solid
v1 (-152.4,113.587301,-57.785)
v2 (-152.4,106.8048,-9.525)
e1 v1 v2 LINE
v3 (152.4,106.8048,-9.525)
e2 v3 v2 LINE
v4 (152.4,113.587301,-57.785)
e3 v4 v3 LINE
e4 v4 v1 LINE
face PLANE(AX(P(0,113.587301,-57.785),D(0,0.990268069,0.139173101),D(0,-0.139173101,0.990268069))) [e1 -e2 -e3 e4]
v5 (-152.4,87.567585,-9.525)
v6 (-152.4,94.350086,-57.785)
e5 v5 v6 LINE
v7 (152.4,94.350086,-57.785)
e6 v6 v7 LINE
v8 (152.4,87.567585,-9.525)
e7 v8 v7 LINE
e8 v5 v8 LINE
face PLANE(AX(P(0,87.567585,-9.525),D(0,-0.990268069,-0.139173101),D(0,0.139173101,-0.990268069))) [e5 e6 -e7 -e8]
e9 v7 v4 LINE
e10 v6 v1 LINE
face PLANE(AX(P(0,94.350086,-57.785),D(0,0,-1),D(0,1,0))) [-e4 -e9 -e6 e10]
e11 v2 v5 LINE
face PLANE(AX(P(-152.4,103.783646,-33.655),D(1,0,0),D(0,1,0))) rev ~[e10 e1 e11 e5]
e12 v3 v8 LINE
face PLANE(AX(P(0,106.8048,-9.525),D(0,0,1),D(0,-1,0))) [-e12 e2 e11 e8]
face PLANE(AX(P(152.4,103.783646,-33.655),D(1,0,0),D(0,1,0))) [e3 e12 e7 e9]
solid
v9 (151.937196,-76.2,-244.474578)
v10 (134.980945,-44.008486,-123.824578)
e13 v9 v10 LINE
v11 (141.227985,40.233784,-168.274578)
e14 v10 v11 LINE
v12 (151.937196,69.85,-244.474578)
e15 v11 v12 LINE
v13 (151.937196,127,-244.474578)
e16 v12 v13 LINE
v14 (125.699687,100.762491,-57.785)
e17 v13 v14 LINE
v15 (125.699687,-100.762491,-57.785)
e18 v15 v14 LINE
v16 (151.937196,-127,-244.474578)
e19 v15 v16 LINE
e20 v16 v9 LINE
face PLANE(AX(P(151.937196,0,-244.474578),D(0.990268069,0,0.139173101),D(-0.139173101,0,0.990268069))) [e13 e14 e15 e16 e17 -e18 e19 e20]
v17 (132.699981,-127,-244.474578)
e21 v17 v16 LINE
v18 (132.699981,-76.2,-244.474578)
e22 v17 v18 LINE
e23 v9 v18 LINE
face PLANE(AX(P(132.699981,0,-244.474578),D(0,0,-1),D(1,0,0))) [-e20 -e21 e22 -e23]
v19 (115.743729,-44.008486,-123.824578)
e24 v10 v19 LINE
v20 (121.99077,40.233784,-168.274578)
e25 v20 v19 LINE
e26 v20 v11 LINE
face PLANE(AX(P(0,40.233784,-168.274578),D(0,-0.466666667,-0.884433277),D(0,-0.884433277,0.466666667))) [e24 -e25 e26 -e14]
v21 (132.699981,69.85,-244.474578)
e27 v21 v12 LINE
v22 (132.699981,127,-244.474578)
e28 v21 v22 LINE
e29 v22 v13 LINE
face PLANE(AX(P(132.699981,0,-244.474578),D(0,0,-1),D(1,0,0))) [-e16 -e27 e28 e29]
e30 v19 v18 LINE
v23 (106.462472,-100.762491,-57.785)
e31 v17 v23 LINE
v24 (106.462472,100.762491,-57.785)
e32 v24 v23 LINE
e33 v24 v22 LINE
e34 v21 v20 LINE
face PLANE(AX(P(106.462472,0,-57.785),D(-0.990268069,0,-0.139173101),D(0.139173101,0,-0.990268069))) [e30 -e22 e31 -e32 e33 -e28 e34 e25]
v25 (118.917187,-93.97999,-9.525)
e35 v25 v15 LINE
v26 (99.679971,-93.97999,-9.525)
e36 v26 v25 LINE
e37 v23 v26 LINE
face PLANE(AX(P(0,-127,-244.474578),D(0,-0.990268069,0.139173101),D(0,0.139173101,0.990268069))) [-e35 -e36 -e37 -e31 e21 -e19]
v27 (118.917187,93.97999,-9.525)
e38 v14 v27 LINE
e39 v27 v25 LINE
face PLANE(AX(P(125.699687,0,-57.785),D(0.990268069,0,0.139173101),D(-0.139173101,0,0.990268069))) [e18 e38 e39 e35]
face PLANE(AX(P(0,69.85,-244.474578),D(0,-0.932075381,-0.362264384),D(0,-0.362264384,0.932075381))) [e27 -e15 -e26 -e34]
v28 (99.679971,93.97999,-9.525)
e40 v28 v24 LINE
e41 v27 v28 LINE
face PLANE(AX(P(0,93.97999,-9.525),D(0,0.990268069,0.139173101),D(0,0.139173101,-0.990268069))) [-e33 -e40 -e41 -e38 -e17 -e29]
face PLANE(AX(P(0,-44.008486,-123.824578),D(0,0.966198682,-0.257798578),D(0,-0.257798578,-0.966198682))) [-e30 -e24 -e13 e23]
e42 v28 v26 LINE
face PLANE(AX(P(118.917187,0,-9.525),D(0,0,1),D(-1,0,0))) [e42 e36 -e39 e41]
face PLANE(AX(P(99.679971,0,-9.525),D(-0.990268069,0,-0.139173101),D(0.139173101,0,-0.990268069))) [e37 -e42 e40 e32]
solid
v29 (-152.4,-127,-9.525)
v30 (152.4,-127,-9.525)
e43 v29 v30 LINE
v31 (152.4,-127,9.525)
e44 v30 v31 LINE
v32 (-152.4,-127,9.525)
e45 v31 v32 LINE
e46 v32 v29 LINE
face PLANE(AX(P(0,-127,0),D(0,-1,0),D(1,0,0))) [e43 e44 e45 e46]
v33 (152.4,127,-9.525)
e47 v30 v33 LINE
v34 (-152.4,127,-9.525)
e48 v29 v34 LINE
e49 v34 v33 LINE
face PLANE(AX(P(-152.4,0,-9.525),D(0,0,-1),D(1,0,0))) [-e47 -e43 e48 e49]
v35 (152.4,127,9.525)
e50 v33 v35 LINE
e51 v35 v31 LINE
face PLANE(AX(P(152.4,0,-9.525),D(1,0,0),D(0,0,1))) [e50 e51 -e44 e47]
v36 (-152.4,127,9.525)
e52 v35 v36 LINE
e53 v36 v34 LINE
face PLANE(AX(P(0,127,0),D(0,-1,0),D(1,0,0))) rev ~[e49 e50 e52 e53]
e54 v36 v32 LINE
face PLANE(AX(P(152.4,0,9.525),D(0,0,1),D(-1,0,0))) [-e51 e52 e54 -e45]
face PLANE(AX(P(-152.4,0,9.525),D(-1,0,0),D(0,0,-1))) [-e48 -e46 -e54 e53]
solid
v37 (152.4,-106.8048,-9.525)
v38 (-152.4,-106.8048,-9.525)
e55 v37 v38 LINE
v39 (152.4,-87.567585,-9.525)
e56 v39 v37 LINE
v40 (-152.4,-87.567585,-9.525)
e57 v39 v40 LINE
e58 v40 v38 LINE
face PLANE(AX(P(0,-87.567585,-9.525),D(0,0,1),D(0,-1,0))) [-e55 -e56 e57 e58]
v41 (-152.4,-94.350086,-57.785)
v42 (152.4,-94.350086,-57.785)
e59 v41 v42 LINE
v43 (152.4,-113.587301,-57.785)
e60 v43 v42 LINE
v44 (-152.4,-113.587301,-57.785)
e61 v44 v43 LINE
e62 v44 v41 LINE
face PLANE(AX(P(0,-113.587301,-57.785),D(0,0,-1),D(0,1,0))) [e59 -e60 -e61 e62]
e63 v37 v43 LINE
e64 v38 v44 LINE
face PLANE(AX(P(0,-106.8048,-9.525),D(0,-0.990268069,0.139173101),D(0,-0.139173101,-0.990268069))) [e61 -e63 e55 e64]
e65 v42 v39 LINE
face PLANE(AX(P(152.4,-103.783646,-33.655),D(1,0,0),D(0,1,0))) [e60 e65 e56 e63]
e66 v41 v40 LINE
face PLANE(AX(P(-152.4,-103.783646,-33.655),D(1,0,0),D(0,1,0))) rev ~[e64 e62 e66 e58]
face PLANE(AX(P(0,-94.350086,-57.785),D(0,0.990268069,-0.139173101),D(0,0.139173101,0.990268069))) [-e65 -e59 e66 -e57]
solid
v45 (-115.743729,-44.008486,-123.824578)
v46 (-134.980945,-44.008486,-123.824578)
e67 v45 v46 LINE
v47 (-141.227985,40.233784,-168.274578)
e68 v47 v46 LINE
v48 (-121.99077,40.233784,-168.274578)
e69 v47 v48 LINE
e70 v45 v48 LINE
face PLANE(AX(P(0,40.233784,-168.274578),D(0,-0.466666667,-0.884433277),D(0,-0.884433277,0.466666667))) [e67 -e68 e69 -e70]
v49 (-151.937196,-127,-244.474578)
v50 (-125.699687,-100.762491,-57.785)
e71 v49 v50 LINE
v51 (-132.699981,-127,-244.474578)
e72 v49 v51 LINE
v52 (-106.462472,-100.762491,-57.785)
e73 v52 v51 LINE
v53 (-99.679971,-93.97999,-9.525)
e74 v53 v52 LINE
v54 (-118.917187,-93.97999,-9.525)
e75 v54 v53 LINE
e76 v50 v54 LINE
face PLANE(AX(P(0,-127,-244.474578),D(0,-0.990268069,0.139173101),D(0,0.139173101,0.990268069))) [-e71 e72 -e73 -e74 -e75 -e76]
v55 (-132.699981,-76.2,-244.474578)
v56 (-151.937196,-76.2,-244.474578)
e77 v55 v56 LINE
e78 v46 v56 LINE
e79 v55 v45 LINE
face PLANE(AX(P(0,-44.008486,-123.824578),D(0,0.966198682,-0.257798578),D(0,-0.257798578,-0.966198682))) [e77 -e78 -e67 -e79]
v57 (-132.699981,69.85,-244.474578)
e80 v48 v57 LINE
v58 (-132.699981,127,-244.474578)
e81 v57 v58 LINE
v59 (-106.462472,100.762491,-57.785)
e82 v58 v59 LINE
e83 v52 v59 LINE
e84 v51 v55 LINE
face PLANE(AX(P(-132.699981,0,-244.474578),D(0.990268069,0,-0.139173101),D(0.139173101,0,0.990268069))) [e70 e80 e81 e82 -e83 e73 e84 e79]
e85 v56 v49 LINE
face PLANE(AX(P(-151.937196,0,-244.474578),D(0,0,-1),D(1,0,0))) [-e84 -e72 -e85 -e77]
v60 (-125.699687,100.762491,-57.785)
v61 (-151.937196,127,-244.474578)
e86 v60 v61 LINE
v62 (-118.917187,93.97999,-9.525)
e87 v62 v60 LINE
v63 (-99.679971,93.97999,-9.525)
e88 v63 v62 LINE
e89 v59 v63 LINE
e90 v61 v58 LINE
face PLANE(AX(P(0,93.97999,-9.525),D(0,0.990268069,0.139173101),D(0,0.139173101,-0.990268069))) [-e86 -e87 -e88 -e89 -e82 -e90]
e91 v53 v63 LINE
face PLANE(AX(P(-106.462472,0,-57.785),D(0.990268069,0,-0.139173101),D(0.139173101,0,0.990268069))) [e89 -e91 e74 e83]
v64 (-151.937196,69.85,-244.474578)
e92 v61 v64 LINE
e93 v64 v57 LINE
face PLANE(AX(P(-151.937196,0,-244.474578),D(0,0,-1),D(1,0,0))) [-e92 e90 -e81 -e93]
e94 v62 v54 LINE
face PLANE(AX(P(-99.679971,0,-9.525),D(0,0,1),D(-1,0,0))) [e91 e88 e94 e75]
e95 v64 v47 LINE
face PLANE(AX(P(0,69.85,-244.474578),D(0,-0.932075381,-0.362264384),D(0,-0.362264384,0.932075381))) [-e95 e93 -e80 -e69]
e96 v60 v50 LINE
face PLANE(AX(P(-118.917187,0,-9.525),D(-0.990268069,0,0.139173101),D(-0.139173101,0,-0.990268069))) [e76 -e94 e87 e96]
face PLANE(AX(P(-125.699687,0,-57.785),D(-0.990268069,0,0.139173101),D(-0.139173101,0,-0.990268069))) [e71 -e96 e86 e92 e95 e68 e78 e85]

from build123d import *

# Parameters (mm, degrees)
F1_DEPTH      = 127
F2_DEPTH      = 127
F2_DEPTH_BACK = 127
F4_DEPTH      = 152.401
F4_DEPTH_BACK = 152.401
F6_DEPTH      = 152.4
F6_DEPTH_BACK = 152.4


# Not quite as in the source:
# - a feature names something its author has since deleted; it is built from what else it names


with BuildPart() as f1:
    # F0 (on Front) → F1 (new body, symmetric)
    with BuildSketch(Plane.XZ):
        Polygon((152.4, -9.525), (152.4, 9.525), (-152.4, 9.525), (-152.4, -9.525), (-151.9371964019, -9.525), (-141.1124509845, -9.525), (-118.9171865446, -9.525), (-99.6799712881, -9.525), (99.6799712881, -9.525), (118.9171865446, -9.525), (141.1124509845, -9.525), (151.9371964019, -9.525), align=None)
    extrude(amount=F1_DEPTH, both=True)


with BuildPart() as f2:
    # F0 (on Front) → F2 (new body, two sides)
    with BuildSketch(Plane.XZ) as f2_sk:
        Polygon((-99.6799712881, -9.525), (-118.9171865446, -9.525), (-125.6996872273, -57.785), (-106.4624719709, -57.785), align=None)
        Polygon((-106.4624719709, -57.785), (-125.6996872273, -57.785), (-151.9371964019, -244.4745783714), (-132.6999811454, -244.4745783714), align=None)
    extrude(amount=F2_DEPTH)
    extrude(f2_sk.sketch, amount=-F2_DEPTH_BACK)


with BuildPart() as f2b:
    # F0 (on Front) → F2, piece 2 (new body, two sides)
    with BuildSketch(Plane.XZ) as f2_2_sk:
        Polygon((125.6996872273, -57.785), (118.9171865446, -9.525), (99.6799712881, -9.525), (106.4624719709, -57.785), align=None)
        Polygon((151.9371964019, -244.4745783714), (125.6996872273, -57.785), (106.4624719709, -57.785), (132.6999811454, -244.4745783714), align=None)
    extrude(amount=F2_DEPTH)
    extrude(f2_2_sk.sketch, amount=-F2_DEPTH_BACK)


with BuildPart() as f4_tool:
    # F3 (on Right) → F4 (new body, two sides)
    with BuildSketch(Plane.YZ) as f4_sk:
        Polygon((-76.2000000004, -244.4745783714), (69.8500000004, -244.4745783714), (40.2337837021, -168.2745783714), (-44.0084859729, -123.8245783714), align=None)
        Polygon((126.9999999998, -244.4745783714), (126.9999999997, -9.525), (93.9799901431, -9.525), align=None)
        Polygon((-127.0000000004, -244.4745783714), (-93.9799901431, -9.525), (-127.0000000004, -9.525), align=None)
    extrude(amount=-F4_DEPTH)
    extrude(f4_sk.sketch, amount=F4_DEPTH_BACK)


with BuildPart() as f2_1:
    add(f2.part)

    # F4: cut by f4_tool
    add(f4_tool.part, mode=Mode.SUBTRACT)


with BuildPart() as f2b_1:
    add(f2b.part)

    # F4: cut by f4_tool
    add(f4_tool.part, mode=Mode.SUBTRACT)


with BuildPart() as f6:
    # F5 (on Right) → F6 (new body, two sides)
    with BuildSketch(Plane.YZ) as f6_sk:
        Polygon((-93.9799901431, -9.525), (-106.8048003141, -9.525), (-113.5873009968, -57.785), (-100.7624908258, -57.785), align=None)
        Polygon((-87.5675850576, -9.525), (-93.9799901431, -9.525), (-100.7624908258, -57.785), (-94.3500857403, -57.785), align=None)
    extrude(amount=F6_DEPTH)
    extrude(f6_sk.sketch, amount=-F6_DEPTH_BACK)


with BuildPart() as f6b:
    # F5 (on Right) → F6, piece 2 (new body, two sides)
    with BuildSketch(Plane.YZ) as f6_2_sk:
        Polygon((106.8048003141, -9.525), (93.9799901431, -9.525), (100.7624908258, -57.785), (113.5873009968, -57.785), align=None)
        Polygon((93.9799901431, -9.525), (87.5675850576, -9.525), (94.3500857403, -57.785), (100.7624908258, -57.785), align=None)
    extrude(amount=F6_DEPTH)
    extrude(f6_2_sk.sketch, amount=-F6_DEPTH_BACK)


solid = Compound([f1.part, f2_1.part, f2b_1.part, f6.part, f6b.part])
